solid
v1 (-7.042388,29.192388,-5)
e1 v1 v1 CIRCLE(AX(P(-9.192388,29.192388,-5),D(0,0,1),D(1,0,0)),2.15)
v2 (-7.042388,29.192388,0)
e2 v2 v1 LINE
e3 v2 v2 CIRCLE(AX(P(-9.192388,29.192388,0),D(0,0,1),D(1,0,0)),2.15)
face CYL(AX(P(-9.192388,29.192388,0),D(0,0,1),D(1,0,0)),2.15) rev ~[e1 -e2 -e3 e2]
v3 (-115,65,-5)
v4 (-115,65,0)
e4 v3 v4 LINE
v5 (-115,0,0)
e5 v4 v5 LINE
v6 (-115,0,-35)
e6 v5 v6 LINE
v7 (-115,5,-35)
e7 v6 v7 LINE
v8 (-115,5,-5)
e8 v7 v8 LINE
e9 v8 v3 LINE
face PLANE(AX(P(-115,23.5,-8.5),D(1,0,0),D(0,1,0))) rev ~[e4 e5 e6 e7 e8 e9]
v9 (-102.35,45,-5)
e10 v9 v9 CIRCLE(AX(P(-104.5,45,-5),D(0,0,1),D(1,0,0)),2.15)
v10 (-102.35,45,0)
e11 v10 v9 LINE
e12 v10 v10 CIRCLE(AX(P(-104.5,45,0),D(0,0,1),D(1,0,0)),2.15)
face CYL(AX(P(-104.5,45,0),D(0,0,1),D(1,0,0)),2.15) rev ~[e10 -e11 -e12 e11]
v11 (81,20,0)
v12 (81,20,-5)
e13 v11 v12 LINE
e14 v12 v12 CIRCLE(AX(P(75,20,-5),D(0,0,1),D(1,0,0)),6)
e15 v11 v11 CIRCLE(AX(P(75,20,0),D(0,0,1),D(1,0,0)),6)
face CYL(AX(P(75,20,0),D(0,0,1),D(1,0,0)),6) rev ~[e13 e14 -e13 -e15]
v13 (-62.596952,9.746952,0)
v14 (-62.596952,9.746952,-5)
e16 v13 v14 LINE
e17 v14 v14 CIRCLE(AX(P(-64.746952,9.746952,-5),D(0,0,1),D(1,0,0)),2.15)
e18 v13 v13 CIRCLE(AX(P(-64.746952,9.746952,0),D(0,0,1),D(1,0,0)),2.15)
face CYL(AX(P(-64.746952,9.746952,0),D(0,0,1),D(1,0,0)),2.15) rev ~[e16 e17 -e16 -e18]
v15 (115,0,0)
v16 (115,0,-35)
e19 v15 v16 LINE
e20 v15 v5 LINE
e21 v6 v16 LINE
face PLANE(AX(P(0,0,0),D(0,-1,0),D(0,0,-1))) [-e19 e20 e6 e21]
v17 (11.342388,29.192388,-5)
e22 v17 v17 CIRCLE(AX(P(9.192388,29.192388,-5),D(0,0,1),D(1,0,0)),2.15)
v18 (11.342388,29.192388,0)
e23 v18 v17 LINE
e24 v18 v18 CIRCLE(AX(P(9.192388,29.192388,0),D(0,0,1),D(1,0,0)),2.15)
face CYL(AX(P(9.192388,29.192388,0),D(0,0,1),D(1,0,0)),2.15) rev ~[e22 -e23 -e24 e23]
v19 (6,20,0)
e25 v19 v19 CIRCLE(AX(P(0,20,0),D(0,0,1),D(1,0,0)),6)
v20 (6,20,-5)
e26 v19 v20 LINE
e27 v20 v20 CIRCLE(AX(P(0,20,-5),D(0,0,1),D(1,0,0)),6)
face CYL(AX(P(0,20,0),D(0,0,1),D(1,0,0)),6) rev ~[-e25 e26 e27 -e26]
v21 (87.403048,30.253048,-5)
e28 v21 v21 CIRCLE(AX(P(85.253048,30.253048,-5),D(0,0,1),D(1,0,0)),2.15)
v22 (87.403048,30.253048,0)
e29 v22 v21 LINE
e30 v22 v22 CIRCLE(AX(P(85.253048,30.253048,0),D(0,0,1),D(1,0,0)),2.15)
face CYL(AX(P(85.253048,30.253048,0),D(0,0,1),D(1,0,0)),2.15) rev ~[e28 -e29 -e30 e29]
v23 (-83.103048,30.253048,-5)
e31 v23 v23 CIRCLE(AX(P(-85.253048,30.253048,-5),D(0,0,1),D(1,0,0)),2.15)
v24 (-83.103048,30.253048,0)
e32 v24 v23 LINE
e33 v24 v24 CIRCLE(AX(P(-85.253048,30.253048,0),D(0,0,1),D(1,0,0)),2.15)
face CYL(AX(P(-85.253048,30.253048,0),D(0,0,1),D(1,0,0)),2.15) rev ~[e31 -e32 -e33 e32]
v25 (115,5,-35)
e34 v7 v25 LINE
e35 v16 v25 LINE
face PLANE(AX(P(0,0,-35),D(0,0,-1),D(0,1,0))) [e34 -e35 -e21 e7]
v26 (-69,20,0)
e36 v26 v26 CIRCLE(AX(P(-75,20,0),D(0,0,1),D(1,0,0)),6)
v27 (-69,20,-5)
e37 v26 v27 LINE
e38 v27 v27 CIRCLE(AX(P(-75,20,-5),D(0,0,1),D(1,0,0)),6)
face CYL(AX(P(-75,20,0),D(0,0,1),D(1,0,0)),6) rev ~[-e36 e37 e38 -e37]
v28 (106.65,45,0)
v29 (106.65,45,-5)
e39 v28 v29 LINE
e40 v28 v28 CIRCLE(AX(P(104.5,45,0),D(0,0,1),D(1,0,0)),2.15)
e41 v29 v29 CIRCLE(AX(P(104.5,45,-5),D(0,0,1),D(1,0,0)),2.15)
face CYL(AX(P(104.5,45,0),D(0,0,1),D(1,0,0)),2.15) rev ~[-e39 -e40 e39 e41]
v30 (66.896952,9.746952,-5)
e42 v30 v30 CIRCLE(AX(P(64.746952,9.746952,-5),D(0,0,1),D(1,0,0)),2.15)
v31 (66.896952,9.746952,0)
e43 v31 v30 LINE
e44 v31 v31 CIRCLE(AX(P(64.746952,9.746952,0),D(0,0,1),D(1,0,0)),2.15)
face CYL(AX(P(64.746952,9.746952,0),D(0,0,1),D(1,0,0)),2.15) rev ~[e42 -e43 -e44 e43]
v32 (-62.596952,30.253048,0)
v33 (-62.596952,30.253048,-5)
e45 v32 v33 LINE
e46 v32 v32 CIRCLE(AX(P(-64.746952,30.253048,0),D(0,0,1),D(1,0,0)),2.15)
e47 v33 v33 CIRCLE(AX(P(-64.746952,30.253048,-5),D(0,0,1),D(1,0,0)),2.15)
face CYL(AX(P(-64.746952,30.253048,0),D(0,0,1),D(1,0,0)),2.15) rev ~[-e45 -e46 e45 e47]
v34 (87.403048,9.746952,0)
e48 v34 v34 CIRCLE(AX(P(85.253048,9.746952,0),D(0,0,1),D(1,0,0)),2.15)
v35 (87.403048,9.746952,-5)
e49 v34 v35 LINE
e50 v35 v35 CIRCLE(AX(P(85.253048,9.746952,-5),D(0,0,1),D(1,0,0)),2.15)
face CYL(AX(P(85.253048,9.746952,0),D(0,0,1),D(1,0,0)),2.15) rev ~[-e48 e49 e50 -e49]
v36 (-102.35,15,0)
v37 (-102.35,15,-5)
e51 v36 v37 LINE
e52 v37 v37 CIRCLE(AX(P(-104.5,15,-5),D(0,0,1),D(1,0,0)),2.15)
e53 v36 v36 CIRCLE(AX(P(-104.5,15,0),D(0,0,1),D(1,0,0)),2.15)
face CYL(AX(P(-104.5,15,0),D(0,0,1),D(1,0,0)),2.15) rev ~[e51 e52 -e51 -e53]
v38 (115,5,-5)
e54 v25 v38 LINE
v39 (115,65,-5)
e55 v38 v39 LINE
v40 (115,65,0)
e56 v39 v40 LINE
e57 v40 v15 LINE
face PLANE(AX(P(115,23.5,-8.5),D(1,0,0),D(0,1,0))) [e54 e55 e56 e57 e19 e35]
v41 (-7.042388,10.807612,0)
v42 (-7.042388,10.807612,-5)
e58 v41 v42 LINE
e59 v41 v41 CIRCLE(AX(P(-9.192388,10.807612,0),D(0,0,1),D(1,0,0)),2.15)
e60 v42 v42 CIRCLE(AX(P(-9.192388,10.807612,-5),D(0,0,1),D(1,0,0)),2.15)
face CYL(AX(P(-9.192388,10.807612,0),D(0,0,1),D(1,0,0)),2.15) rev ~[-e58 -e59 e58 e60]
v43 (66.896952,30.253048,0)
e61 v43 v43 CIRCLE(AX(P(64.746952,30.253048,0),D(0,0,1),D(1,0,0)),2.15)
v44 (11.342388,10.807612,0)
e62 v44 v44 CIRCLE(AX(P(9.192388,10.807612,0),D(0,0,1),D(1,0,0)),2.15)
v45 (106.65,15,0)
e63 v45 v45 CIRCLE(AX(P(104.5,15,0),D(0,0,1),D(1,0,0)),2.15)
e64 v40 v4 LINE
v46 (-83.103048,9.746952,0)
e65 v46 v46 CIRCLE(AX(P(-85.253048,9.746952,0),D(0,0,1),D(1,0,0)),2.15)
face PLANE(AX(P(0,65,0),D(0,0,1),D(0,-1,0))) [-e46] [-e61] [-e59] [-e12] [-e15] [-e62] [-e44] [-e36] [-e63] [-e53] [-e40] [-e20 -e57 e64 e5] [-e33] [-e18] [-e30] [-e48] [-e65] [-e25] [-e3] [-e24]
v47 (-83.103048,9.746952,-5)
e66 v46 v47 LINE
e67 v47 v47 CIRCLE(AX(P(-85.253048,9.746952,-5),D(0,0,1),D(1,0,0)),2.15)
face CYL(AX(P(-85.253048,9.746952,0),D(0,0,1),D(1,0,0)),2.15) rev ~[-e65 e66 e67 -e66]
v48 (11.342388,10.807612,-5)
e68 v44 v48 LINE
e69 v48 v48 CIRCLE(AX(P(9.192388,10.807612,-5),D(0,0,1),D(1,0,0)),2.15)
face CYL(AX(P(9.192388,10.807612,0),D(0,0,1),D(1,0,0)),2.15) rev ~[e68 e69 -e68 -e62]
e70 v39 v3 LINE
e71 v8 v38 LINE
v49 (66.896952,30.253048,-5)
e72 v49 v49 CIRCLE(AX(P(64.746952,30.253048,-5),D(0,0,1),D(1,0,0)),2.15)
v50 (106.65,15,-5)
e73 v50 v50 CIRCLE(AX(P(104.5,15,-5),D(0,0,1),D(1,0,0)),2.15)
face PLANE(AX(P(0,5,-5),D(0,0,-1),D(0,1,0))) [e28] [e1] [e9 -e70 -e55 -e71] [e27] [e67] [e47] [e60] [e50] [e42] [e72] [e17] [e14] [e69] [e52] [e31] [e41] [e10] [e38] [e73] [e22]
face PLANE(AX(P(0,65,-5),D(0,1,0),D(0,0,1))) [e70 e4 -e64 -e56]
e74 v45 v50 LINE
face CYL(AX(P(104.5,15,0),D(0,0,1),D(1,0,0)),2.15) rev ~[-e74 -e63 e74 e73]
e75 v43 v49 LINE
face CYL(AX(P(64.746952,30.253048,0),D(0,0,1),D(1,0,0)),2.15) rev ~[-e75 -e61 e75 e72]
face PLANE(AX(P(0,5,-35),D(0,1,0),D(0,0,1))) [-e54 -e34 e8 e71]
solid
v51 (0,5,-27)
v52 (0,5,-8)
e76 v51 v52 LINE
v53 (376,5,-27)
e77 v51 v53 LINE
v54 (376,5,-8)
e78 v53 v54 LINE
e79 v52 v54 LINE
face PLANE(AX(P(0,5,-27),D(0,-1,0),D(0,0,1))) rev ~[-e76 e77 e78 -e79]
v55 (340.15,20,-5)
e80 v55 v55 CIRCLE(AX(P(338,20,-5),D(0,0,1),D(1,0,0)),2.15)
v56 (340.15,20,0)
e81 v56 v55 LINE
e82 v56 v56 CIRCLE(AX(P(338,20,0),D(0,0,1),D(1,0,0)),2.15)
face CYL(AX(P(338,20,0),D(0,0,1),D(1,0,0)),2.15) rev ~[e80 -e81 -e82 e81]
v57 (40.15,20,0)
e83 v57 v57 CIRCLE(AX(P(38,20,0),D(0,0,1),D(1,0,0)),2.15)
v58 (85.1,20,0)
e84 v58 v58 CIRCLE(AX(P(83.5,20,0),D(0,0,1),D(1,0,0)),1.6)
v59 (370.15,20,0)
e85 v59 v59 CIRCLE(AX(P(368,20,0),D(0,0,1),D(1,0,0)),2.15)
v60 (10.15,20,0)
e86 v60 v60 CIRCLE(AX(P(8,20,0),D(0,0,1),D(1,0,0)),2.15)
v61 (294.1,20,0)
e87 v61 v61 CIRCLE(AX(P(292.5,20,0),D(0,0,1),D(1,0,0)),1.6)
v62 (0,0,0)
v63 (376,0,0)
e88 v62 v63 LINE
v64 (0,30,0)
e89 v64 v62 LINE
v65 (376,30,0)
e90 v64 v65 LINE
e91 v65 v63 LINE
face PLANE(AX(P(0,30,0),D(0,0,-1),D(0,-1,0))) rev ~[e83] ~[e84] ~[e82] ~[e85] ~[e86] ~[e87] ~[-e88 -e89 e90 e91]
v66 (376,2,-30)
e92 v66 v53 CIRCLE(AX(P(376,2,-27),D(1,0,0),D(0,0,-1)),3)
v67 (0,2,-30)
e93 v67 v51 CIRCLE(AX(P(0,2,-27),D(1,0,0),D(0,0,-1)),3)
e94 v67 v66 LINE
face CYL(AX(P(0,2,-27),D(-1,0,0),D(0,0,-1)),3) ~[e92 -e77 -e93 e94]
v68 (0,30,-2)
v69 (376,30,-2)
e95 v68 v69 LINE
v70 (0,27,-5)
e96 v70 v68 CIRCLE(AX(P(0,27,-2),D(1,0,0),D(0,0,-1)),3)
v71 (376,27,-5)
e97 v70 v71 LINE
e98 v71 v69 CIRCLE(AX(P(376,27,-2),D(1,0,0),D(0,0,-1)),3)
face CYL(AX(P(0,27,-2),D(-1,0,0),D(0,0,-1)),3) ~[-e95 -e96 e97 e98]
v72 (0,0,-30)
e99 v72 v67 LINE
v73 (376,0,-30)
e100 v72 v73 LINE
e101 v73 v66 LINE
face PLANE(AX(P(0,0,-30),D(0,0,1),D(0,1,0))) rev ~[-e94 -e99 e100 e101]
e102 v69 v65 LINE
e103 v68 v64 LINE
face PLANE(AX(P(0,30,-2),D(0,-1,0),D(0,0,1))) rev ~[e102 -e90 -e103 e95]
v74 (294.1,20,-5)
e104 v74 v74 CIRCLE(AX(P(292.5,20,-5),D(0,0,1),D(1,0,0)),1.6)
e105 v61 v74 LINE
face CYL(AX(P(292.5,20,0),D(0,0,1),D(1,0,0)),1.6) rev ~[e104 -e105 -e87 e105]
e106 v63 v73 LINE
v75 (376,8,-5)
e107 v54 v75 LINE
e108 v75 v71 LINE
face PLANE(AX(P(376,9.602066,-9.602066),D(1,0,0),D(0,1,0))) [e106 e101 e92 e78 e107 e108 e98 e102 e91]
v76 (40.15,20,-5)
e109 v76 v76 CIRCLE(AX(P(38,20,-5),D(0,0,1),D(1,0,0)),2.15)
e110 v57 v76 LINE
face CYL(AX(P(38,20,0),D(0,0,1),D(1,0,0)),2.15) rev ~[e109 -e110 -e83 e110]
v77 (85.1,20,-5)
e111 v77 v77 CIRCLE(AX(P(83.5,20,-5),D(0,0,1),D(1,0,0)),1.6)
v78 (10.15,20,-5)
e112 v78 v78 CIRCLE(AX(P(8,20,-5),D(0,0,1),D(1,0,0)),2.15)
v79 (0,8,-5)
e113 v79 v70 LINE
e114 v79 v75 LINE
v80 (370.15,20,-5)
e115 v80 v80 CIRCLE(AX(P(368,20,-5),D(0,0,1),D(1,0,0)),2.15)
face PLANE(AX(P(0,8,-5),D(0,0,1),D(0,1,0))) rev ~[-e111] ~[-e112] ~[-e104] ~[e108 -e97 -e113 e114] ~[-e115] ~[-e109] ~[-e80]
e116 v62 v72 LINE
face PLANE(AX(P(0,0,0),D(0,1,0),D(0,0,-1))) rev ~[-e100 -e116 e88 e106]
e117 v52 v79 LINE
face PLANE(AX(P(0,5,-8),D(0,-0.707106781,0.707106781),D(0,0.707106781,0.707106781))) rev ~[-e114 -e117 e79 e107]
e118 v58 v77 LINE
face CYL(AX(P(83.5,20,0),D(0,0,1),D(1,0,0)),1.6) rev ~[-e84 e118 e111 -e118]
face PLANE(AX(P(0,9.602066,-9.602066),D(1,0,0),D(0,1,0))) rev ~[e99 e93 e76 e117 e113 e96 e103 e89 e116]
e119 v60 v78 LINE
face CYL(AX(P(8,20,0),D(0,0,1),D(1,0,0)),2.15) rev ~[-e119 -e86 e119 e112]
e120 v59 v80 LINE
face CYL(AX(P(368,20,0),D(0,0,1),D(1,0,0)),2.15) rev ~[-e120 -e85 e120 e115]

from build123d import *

# Parameters (mm, degrees)
F4_DEPTH  = 115
F6_R      = 6
F6_R_2    = 2.15
F8_DEPTH  = 25
F7_R      = 6
F7_R_2    = 2.15
F9_DEPTH  = 25
F10_DEPTH = 376
F11_R     = 2.15
F12_DEPTH = 25
F13_R     = 2.15
F14_DEPTH = 25
F15_R     = 1.6
F16_DEPTH = 25


with BuildPart() as f4:
    # F0 (on Right) → F4 (new body, symmetric)
    with BuildSketch(Plane.YZ):
        Polygon((0, 0), (0, -35), (5, -35), (5, -5), (65, -5), (65, 0), align=None)
    extrude(amount=F4_DEPTH, both=True)

    # F6 (on face) → F8 (cut)
    with BuildSketch(Plane.XY):
        with Locations((0, 20)):
            Circle(F6_R)
        with Locations((9.1923881554, 29.1923881554)):
            Circle(F6_R_2)
        with Locations((-9.1923881554, 29.1923881554)):
            Circle(F6_R_2)
        with Locations((-9.1923881554, 10.8076118446)):
            Circle(F6_R_2)
        with Locations((9.1923881554, 10.8076118446)):
            Circle(F6_R_2)
    extrude(amount=-F8_DEPTH, mode=Mode.SUBTRACT)

    # F7 (on face) → F9 (cut)
    with BuildSketch(Plane.XY):
        with Locations((-75, 20)):
            Circle(F7_R)
        with Locations((-64.7469516728, 30.2530483272)):
            Circle(F7_R_2)
        with Locations((-85.2530483272, 30.2530483272)):
            Circle(F7_R_2)
        with Locations((-85.2530483272, 9.7469516728)):
            Circle(F7_R_2)
        with Locations((-64.7469516728, 9.7469516728)):
            Circle(F7_R_2)
        with Locations((64.7469516728, 9.7469516728)):
            Circle(F7_R_2)
        with Locations((85.2530483272, 9.7469516728)):
            Circle(F7_R_2)
        with Locations((85.2530483272, 30.2530483272)):
            Circle(F7_R_2)
        with Locations((64.7469516728, 30.2530483272)):
            Circle(F7_R_2)
        with Locations((75, 20)):
            Circle(F7_R)
    extrude(amount=-F9_DEPTH, mode=Mode.SUBTRACT)

    # F11 (on face) → F12 (cut)
    with BuildSketch(Plane.XY):
        with Locations((-104.5, 45)):
            Circle(F11_R)
        with Locations((-104.5, 15)):
            Circle(F11_R)
        with Locations((104.5, 45)):
            Circle(F11_R)
        with Locations((104.5, 15)):
            Circle(F11_R)
    extrude(amount=-F12_DEPTH, mode=Mode.SUBTRACT)


with BuildPart() as f10:
    # F1 (on Right) → F10 (new body)
    with BuildSketch(Plane.YZ):
        with BuildLine():
            Line((0, 0), (0, -30))
            Line((0, -30), (2, -30))
            ThreePointArc((2, -30), (4.1213203436, -29.1213203436), (5, -27))
            Line((5, -27), (5, -8))
            Line((5, -8), (5, -5))
            Line((5, -5), (8, -5))
            Line((8, -5), (27, -5))
            ThreePointArc((27, -5), (29.1213203436, -4.1213203436), (30, -2))
            Line((30, -2), (30, 0))
            Line((30, 0), (0, 0))
        make_face()
        Polygon((5, -5), (5, -8), (8, -5), align=None)
    extrude(amount=F10_DEPTH)

    # F13 (on face) → F14 (cut)
    with BuildSketch(Plane.XY):
        with Locations((8, 20)):
            Circle(F13_R)
        with Locations((38, 20)):
            Circle(F13_R)
        with Locations((368, 20)):
            Circle(F13_R)
        with Locations((338, 20)):
            Circle(F13_R)
    extrude(amount=-F14_DEPTH, mode=Mode.SUBTRACT)

    # F15 (on face) → F16 (cut)
    with BuildSketch(Plane.XY):
        with Locations((83.5, 20)):
            Circle(F15_R)
        with Locations((292.5, 20)):
            Circle(F15_R)
    extrude(amount=-F16_DEPTH, mode=Mode.SUBTRACT)


solid = Compound([f4.part, f10.part])
